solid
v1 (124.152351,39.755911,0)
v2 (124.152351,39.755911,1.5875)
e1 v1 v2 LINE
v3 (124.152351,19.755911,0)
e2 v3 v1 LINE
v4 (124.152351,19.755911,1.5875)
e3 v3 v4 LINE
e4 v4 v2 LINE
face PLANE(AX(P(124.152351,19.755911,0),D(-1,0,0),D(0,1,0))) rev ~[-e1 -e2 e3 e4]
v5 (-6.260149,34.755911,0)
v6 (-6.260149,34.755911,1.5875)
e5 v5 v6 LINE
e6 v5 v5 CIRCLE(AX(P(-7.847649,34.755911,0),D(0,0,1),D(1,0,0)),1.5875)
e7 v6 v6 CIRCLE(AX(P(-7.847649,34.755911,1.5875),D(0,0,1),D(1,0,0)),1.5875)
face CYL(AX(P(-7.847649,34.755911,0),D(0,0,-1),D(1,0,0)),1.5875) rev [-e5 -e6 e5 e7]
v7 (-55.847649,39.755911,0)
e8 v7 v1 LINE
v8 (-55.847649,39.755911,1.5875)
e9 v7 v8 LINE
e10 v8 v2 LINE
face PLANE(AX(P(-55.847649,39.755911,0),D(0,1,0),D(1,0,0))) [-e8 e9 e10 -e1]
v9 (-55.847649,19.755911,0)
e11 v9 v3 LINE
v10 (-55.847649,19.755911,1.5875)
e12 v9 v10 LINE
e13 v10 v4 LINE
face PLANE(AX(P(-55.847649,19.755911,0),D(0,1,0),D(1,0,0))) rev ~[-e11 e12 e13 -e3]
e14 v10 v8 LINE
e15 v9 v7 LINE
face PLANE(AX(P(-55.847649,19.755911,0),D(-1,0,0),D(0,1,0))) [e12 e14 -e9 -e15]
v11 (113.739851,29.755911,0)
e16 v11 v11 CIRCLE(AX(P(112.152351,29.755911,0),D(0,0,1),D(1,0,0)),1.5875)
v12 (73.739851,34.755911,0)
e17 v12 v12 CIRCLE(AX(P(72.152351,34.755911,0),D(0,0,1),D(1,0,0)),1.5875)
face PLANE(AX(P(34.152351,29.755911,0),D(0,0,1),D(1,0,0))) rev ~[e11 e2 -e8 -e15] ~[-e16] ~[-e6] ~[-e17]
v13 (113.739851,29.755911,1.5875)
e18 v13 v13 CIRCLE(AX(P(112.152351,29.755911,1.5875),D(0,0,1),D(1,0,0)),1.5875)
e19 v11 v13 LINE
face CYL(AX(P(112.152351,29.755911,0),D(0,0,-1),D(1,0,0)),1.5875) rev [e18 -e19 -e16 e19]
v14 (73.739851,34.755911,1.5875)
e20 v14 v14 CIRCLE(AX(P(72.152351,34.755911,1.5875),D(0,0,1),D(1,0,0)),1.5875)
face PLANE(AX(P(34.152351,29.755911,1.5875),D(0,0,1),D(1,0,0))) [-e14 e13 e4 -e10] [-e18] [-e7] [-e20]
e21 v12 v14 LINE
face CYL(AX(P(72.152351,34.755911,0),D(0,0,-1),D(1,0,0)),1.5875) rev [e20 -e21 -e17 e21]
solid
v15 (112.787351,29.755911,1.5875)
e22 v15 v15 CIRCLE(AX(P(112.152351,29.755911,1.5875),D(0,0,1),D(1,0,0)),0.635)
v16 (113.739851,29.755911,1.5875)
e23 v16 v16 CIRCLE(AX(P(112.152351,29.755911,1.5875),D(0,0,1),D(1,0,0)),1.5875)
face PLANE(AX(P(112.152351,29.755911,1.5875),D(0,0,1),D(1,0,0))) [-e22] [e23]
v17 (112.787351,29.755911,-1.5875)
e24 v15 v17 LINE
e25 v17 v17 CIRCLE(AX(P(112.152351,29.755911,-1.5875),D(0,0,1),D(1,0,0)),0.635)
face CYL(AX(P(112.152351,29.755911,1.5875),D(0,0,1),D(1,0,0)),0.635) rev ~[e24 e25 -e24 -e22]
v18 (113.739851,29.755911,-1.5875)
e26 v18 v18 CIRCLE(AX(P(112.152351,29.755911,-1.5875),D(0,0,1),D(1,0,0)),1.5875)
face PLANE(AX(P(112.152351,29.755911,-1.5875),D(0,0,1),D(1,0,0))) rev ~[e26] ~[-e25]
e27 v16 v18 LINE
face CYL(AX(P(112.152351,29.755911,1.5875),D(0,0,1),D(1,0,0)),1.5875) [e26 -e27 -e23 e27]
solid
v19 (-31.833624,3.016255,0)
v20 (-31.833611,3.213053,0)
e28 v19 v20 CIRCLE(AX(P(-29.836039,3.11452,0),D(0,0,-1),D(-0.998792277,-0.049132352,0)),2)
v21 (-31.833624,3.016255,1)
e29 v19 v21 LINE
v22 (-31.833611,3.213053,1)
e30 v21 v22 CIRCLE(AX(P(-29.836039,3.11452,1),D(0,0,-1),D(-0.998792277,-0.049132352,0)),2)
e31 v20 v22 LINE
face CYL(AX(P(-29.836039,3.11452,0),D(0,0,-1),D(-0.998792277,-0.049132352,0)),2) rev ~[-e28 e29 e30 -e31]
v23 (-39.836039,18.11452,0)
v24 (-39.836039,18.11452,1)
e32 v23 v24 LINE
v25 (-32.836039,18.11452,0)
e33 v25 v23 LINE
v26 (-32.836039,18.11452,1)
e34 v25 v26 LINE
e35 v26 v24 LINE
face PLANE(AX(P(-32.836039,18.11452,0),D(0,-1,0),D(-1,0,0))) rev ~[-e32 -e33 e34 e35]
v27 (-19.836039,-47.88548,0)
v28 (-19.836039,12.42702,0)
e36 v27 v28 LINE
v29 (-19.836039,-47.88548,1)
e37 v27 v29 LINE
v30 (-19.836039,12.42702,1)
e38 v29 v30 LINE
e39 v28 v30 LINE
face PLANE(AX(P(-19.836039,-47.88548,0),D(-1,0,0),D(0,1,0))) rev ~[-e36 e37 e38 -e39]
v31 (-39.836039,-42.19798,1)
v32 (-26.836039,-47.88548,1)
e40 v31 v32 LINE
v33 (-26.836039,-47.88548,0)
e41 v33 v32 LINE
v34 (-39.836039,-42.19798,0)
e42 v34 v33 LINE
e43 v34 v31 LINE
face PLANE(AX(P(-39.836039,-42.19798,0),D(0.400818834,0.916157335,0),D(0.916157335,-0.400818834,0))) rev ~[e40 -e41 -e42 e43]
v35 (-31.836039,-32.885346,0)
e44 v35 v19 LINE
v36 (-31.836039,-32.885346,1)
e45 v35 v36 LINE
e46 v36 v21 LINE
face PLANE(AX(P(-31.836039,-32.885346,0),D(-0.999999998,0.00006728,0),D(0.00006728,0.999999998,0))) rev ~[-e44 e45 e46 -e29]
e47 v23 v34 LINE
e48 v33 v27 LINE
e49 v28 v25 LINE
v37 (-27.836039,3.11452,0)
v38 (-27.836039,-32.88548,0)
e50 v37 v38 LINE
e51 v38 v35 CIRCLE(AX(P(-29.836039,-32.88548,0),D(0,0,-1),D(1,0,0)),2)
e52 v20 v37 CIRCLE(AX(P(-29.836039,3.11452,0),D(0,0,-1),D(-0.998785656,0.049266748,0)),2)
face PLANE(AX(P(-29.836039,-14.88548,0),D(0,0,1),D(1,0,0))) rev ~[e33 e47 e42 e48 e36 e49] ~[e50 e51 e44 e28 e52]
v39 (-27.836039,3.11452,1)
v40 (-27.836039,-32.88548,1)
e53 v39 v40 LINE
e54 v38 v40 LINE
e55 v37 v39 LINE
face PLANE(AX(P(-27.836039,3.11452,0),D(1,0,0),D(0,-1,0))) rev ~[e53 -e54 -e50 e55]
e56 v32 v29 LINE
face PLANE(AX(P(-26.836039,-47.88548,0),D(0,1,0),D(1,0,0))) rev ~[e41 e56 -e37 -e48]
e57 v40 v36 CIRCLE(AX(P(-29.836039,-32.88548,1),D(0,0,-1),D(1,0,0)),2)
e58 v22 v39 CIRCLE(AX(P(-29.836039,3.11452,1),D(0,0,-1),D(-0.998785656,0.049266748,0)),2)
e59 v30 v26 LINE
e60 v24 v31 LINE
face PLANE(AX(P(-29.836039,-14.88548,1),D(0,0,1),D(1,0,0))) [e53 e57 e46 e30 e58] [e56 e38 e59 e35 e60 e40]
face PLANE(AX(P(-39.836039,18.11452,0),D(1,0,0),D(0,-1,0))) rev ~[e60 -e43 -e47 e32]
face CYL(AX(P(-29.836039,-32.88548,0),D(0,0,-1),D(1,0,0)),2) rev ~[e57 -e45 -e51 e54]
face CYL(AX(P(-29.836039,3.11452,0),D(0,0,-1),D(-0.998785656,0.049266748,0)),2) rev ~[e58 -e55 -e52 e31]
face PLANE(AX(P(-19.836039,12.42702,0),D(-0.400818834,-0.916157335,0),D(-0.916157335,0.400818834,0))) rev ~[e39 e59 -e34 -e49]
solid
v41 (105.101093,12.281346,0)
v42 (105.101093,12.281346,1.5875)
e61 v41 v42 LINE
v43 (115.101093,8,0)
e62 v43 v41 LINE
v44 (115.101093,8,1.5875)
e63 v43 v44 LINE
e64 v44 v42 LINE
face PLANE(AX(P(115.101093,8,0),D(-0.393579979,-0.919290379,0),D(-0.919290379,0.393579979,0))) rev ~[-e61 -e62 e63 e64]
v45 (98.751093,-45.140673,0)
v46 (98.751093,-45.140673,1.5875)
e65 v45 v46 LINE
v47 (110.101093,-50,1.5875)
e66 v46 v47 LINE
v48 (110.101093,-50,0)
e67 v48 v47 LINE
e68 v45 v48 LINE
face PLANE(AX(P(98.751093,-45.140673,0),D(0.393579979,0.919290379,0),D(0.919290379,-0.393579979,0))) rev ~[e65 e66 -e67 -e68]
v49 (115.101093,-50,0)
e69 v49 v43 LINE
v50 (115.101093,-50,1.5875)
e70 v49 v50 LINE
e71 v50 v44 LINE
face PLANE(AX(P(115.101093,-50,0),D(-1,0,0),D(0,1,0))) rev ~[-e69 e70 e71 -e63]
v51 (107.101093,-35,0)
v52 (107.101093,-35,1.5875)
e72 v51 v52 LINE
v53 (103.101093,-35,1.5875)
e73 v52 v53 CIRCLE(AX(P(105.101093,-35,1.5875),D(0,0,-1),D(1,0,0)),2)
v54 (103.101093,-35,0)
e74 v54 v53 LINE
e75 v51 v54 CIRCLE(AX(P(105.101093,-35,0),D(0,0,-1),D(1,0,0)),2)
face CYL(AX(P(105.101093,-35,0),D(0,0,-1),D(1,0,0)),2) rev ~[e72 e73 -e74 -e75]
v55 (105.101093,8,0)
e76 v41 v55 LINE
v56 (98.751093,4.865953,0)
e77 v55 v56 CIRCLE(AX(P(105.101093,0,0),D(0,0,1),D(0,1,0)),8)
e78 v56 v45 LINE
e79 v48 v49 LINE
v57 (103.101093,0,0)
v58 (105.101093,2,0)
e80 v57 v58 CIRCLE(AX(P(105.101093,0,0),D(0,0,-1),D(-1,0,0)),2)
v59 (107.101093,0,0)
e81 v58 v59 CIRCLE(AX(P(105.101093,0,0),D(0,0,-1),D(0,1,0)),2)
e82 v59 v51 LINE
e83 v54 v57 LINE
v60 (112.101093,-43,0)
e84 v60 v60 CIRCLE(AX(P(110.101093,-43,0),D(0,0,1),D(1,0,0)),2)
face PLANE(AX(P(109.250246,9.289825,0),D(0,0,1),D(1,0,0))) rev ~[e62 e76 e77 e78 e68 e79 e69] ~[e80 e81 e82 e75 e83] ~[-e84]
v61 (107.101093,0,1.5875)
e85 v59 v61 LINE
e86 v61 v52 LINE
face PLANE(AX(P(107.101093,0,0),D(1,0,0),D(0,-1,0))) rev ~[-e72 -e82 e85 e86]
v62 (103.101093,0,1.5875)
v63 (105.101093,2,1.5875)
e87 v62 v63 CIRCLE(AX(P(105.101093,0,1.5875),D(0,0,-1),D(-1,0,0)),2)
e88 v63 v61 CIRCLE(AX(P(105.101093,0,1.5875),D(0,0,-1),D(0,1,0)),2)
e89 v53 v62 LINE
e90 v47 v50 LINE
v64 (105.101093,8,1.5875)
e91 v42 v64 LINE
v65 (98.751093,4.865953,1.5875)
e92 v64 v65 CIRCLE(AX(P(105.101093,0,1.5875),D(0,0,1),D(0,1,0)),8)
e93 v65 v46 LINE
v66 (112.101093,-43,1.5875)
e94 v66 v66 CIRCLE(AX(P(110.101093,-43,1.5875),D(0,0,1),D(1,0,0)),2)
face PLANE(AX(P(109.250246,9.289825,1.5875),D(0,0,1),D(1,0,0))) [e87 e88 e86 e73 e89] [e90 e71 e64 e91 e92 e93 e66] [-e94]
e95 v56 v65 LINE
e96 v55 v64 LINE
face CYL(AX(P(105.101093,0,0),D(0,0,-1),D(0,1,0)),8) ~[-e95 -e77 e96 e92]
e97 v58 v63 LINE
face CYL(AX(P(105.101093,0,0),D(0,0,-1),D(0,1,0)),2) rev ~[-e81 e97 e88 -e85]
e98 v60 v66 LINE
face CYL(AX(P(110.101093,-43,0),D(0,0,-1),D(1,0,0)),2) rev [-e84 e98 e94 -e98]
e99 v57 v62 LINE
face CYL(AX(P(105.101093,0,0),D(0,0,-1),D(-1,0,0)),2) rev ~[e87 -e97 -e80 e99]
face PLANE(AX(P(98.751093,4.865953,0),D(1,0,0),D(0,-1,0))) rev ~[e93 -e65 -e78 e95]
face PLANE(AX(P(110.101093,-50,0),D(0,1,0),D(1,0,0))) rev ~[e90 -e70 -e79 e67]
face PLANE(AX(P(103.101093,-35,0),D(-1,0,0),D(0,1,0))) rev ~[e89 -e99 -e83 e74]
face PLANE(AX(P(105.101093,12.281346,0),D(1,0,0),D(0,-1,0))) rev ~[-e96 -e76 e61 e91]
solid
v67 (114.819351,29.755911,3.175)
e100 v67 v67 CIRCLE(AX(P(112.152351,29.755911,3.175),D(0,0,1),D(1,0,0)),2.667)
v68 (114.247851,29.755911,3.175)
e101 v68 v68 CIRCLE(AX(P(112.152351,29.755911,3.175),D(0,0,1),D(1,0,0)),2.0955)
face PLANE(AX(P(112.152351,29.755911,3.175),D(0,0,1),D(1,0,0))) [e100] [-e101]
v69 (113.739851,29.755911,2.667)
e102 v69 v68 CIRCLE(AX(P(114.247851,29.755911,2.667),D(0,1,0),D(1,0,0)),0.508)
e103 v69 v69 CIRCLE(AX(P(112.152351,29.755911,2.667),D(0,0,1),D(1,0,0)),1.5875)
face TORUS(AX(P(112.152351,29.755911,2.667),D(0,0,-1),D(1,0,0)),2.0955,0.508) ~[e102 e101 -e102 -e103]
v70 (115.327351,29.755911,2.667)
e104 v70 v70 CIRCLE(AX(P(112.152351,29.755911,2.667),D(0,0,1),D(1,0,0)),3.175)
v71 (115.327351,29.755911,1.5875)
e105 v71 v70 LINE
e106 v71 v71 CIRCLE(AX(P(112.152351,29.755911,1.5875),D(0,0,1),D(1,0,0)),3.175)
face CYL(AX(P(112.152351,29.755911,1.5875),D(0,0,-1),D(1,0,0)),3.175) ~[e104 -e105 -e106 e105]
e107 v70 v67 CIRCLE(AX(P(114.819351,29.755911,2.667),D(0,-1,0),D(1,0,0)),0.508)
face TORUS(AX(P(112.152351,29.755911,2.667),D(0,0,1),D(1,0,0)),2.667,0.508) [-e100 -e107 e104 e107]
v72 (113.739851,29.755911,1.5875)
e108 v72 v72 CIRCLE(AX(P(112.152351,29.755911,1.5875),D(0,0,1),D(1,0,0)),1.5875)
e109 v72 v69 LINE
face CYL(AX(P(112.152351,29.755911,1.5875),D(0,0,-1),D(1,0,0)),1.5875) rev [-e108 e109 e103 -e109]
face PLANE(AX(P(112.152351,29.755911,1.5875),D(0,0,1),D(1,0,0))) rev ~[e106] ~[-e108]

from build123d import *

# Parameters (mm, degrees)
F0_W      = 180
F0_H      = 20
F0_R      = 1.5875
F1_DEPTH  = 1.5875
F2_R      = 2
F3_DEPTH  = 1.5875
F4_R      = 1.5875
F5_DEPTH  = 3.175
F6_R      = 3.175
F6_R_2    = 1.5875
F7_DEPTH  = 1.5875
F6_R_3    = 0.635
F8_DEPTH  = 3.176
F9_R      = 0.508
F10_DEPTH = 1


# Not quite as in the source:
# - a feature names something its author has since deleted; it is built from what else it names


with BuildPart() as f1:
    # F0 (on Top) → F1 (new body)
    with BuildSketch(Plane.XY):
        with Locations((34.1523514688, 29.7559105814)):
            Rectangle(F0_W, F0_H)
        with Locations((112.1523514688, 29.7559105814)):
            Circle(F0_R, mode=Mode.SUBTRACT)
        with Locations((-7.8476485312, 34.7559105814)):
            Circle(F0_R, mode=Mode.SUBTRACT)
        with Locations((72.1523514688, 34.7559105814)):
            Circle(F0_R, mode=Mode.SUBTRACT)
    extrude(amount=F1_DEPTH)


with BuildPart() as f3:
    # F2 (on Top) → F3 (new body)
    with BuildSketch(Plane.XY):
        Polygon((105.1010932944, 12.2813455657), (105.1010932944, 8), (115.1010932944, 8), align=None)
        with BuildLine():
            Line((115.1010932944, 8), (105.1010932944, 8))
            ThreePointArc((105.1010932944, 8), (110.7579475439, 5.6568542495), (113.1010932944, 0))
            ThreePointArc((113.1010932944, 0), (111.4256486147, -4.8989794856), (107.1010932944, -7.7459666924))
            Line((107.1010932944, -7.7459666924), (107.1010932944, -35))
            ThreePointArc((107.1010932944, -35), (105.1010932944, -37), (103.1010932944, -35))
            Line((103.1010932944, -35), (103.1010932944, -7.7459666924))
            ThreePointArc((103.1010932944, -7.7459666924), (100.6847322913, -6.670513885), (98.7510932944, -4.865953144))
            Line((98.7510932944, -4.865953144), (98.7510932944, -43))
            Line((98.7510932944, -43), (110.1010932944, -47.8593272171))
            Line((110.1010932944, -47.8593272171), (115.1010932944, -50))
            Line((115.1010932944, -50), (115.1010932944, 8))
        make_face()
        with Locations((110.1010932944, -43)):
            Circle(F2_R, mode=Mode.SUBTRACT)
        with BuildLine():
            ThreePointArc((113.1010932944, 0), (110.7579475439, 5.6568542495), (105.1010932944, 8))
            ThreePointArc((105.1010932944, 8), (101.5604454124, 7.1738283069), (98.7510932944, 4.865953144))
            Line((98.7510932944, 4.865953144), (98.7510932944, -4.865953144))
            ThreePointArc((98.7510932944, -4.865953144), (100.6847322913, -6.670513885), (103.1010932944, -7.7459666924))
            Line((103.1010932944, -7.7459666924), (103.1010932944, 0))
            ThreePointArc((103.1010932944, 0), (103.686879732, 1.4142135624), (105.1010932944, 2))
            ThreePointArc((105.1010932944, 2), (106.5153068568, 1.4142135624), (107.1010932944, 0))
            Line((107.1010932944, 0), (107.1010932944, -7.7459666924))
            ThreePointArc((107.1010932944, -7.7459666924), (111.4256486147, -4.8989794856), (113.1010932944, 0))
        make_face()
        Polygon((110.1010932944, -50), (115.1010932944, -50), (110.1010932944, -47.8593272171), align=None)
        Polygon((110.1010932944, -47.8593272171), (98.7510932944, -43), (98.7510932944, -45.1406727829), (110.1010932944, -50), align=None)
    extrude(amount=F3_DEPTH)


with BuildPart() as f5:
    # F4 (on face) → F5 (new body)
    with BuildSketch(Plane.XY.offset(1.5875)):
        with Locations((112.1523514688, 29.7559105814)):
            Circle(F4_R)
    extrude(amount=-F5_DEPTH)

    # F6 (on face) → F8 (cut, through all)
    with BuildSketch(Plane.XY.offset(1.5875)):
        with Locations((112.1523514688, 29.7559105814)):
            Circle(F6_R_3)
    extrude(amount=-F8_DEPTH, mode=Mode.SUBTRACT)


with BuildPart() as f7:
    # F6 (on face) → F7 (new body)
    with BuildSketch(Plane.XY.offset(1.5875)):
        with Locations((112.1523514688, 29.7559105814)):
            Circle(F6_R)
        with Locations((112.1523514688, 29.7559105814)):
            Circle(F6_R_2, mode=Mode.SUBTRACT)
    extrude(amount=F7_DEPTH)

    # F9
    f9_edges = [f7.edges().sort_by_distance(p)[0] for p in [
        (110.564851, 29.755911, 3.175),
        (108.977351, 29.755911, 3.175),
    ]]
    fillet(f9_edges, radius=F9_R)


with BuildPart() as f10:
    # F2 (on Top) → F10 (new body)
    with BuildSketch(Plane.XY):
        Polygon((-26.8360394478, -47.8854802153), (-19.8360394478, -47.8854802153), (-19.8360394478, 12.4270197847), (-32.8360394478, 18.1145197847), (-39.8360394478, 18.1145197847), (-39.8360394478, -42.1979802153), align=None)
        with BuildLine():
            Line((-27.8360394478, 3.1145197847), (-27.8360394478, -32.8854802153))
            ThreePointArc((-27.8360394478, -32.8854802153), (-29.8361067273, -34.8854802142), (-31.8360394433, -32.8853456563))
            Line((-31.8360394433, -32.8853456563), (-31.8336240012, 3.0162550804))
            ThreePointArc((-31.8336240012, 3.0162550804), (-31.8360394433, 3.1146543437), (-31.8336107607, 3.2130532811))
            ThreePointArc((-31.8336107607, 3.2130532811), (-29.7867577361, 5.1139125207), (-27.8360394478, 3.1145197847))
        make_face(mode=Mode.SUBTRACT)
    extrude(amount=F10_DEPTH)


solid = Compound([f1.part, f3.part, f5.part, f7.part, f10.part])
